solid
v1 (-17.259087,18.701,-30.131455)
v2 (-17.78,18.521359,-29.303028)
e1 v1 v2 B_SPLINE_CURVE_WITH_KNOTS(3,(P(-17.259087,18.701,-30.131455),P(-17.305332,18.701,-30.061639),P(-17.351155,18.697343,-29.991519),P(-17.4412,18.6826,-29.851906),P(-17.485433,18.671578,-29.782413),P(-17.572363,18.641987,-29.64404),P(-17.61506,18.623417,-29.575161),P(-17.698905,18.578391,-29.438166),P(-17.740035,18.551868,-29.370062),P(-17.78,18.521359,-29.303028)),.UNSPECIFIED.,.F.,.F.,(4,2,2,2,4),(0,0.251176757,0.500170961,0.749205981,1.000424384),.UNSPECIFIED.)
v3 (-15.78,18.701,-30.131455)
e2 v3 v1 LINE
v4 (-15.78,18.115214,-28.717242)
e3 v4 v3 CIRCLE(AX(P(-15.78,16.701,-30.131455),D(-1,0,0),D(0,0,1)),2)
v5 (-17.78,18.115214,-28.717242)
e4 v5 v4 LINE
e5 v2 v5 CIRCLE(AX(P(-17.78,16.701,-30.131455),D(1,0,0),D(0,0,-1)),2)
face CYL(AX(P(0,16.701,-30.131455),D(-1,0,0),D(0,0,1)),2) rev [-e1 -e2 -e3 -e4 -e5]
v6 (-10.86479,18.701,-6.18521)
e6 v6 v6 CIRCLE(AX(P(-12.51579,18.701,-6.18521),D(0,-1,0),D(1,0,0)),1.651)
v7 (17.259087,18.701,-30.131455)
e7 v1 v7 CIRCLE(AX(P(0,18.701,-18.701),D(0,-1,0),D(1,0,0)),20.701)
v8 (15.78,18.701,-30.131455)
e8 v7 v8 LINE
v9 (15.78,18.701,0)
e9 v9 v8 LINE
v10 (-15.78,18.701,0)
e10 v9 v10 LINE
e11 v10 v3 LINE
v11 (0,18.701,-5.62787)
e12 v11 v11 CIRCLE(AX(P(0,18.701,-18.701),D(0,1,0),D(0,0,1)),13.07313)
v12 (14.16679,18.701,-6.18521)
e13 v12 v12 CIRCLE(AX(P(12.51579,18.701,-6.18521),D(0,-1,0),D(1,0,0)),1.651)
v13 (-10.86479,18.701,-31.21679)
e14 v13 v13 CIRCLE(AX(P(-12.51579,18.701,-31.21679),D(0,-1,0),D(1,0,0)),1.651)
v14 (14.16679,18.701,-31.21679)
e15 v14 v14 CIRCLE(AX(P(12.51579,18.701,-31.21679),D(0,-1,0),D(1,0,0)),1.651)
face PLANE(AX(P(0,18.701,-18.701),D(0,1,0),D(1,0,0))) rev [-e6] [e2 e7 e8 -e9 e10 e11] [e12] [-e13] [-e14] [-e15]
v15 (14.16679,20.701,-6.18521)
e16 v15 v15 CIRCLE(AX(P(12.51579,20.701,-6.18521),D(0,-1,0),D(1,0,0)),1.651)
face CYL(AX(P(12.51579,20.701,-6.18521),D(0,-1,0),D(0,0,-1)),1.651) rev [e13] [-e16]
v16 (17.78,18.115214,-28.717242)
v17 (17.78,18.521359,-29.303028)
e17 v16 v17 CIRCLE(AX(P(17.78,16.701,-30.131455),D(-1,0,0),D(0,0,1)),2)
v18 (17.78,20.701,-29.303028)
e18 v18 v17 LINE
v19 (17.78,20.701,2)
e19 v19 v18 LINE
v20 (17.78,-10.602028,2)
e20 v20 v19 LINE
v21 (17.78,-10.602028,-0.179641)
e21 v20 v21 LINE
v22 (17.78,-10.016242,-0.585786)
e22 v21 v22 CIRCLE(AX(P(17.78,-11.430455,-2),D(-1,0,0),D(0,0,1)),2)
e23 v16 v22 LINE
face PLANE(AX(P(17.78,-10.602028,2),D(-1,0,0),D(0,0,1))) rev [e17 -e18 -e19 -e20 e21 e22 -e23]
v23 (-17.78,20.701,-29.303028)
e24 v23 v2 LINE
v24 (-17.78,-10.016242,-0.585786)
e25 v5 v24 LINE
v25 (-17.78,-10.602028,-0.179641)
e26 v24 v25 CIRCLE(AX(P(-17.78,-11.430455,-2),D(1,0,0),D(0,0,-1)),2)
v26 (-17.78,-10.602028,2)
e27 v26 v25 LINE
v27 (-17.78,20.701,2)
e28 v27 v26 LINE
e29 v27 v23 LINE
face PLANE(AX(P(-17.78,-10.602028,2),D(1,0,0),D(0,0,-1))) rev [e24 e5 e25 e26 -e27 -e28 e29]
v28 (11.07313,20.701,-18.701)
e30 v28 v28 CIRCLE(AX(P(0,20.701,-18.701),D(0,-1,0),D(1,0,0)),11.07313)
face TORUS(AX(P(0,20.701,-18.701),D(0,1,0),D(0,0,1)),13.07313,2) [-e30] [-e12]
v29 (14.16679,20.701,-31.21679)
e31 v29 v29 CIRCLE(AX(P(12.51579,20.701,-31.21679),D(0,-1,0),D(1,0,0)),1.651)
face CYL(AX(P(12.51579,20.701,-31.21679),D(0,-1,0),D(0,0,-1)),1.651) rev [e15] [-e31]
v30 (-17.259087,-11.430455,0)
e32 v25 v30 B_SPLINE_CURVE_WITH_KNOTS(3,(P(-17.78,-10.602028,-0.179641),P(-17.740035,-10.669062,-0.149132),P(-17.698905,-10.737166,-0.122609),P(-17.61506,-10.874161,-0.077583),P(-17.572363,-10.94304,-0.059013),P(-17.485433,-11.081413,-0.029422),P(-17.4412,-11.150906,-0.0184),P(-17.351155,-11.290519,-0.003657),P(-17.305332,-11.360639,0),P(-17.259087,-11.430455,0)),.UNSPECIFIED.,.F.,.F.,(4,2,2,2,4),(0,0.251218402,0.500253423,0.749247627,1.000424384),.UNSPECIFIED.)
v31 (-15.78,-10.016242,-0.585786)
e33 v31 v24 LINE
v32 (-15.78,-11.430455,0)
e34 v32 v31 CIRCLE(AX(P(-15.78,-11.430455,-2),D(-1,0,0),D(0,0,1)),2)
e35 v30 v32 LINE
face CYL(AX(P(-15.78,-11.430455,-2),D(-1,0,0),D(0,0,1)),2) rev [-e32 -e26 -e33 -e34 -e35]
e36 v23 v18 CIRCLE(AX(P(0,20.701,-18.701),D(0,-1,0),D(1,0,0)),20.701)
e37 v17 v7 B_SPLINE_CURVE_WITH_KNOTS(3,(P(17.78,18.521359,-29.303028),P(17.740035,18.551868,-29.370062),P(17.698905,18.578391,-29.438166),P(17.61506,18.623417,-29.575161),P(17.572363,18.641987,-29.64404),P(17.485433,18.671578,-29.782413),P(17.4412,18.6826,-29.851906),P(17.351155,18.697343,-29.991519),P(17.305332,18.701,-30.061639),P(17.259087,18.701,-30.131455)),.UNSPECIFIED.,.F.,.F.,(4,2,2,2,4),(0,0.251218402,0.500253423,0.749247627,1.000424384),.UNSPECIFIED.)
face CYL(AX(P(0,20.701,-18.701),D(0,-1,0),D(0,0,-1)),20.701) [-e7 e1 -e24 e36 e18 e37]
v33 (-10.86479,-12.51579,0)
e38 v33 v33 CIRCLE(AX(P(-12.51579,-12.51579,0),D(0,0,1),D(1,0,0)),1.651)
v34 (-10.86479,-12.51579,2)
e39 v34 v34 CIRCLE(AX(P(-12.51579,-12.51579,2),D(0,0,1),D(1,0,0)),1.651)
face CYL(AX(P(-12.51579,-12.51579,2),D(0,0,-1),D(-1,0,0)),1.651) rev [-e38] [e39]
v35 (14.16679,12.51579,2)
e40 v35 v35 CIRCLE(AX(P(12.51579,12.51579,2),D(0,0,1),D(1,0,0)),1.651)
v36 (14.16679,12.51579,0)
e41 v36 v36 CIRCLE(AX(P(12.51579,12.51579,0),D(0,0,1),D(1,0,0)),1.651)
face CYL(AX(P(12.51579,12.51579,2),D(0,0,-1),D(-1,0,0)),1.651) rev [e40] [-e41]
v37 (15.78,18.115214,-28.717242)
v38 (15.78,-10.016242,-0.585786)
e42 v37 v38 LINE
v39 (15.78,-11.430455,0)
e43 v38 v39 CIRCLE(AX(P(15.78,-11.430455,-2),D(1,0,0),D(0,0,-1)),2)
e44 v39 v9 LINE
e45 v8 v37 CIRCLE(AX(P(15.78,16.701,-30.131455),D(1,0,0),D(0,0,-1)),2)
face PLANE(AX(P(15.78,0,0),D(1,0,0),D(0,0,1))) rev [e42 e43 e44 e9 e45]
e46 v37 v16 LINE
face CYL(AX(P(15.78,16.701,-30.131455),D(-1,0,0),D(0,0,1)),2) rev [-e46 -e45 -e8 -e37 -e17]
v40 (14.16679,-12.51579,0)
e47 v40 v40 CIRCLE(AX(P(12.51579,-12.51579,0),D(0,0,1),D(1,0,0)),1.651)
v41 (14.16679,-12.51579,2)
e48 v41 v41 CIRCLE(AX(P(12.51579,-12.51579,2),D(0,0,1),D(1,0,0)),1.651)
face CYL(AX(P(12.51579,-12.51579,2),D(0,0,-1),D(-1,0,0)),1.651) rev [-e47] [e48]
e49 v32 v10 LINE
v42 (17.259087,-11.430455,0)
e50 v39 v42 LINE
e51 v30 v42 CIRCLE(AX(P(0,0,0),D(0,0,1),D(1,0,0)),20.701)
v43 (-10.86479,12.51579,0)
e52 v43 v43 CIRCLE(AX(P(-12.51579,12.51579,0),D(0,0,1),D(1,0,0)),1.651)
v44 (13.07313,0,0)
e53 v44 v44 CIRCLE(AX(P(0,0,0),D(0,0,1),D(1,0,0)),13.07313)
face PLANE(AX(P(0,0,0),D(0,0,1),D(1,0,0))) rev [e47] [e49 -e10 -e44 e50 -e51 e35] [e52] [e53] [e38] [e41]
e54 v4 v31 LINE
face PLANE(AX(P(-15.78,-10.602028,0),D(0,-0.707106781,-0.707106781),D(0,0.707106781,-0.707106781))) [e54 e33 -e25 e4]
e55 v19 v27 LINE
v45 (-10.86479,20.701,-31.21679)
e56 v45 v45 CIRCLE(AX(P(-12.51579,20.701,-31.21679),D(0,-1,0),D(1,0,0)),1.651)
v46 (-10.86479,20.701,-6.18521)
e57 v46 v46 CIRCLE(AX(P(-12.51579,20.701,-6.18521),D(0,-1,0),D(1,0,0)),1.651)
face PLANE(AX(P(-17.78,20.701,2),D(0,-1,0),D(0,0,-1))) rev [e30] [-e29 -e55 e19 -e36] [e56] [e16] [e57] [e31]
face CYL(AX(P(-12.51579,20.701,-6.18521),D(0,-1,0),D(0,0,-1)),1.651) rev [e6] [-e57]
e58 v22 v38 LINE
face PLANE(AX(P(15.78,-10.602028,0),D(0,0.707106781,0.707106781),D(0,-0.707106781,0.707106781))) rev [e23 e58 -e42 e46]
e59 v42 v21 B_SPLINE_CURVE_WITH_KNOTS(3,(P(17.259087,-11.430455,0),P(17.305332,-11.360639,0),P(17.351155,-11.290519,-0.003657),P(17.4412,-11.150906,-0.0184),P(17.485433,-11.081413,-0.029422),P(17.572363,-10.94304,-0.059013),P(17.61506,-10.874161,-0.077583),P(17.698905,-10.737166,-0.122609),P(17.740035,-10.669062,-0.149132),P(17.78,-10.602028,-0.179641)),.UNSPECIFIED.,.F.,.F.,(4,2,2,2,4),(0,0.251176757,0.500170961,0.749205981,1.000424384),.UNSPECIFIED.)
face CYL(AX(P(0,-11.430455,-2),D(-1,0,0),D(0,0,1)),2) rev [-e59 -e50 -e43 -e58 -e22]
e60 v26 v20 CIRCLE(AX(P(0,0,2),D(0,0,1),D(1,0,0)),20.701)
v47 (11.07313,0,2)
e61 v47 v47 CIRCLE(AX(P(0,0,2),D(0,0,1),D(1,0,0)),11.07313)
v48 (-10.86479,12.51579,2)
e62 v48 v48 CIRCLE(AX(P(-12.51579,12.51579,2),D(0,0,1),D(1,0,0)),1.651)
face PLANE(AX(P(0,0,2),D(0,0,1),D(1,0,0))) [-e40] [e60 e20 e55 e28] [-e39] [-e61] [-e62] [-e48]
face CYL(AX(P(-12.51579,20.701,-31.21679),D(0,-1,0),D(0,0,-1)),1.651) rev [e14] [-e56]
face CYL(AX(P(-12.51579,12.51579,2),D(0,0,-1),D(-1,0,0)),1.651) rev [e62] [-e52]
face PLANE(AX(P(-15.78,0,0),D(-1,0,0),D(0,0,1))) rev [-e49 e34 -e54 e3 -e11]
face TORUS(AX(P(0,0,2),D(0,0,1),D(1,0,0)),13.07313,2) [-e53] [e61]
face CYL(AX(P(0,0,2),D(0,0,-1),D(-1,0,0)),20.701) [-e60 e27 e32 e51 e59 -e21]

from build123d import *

# Parameters (mm, degrees)
SKETCH1_R           = 1.651
SKETCH1_R_2         = 11.07313
BOSS_EXTRUDE1_DEPTH = 2
BOSS_EXTRUDE2_DEPTH = 2
FILLET2_R           = 2
FILLET3_R           = 2


with BuildPart() as part:
    # Sketch1 → Boss-Extrude1 (new body)
    with BuildSketch(Plane.XY):
        with BuildLine():
            Line((-17.78, -10.602028155), (-17.78, 20.701))
            Line((-17.78, 20.701), (17.78, 20.701))
            Line((17.78, 20.701), (17.78, -10.602028155))
            ThreePointArc((17.78, -10.602028155), (0, -20.701), (-17.78, -10.602028155))
        make_face()
        with Locations((-12.515790027, -12.515790027)):
            Circle(SKETCH1_R, mode=Mode.SUBTRACT)
        with Locations((12.515790027, -12.515790027)):
            Circle(SKETCH1_R, mode=Mode.SUBTRACT)
        with Locations((12.515790027, 12.515790027)):
            Circle(SKETCH1_R, mode=Mode.SUBTRACT)
        with Locations((-12.515790027, 12.515790027)):
            Circle(SKETCH1_R, mode=Mode.SUBTRACT)
        Circle(SKETCH1_R_2, mode=Mode.SUBTRACT)
    boss_extrude1 = extrude(amount=BOSS_EXTRUDE1_DEPTH)

    # Mirror1: Boss-Extrude1 across plane
    add(boss_extrude1.mirror(Plane(origin=(0, 9.3505, -9.3505), x_dir=(0, 0.7071067811865465, 0.7071067811865486), z_dir=(0, -0.7071067811865488, 0.7071067811865464))))

    # Sketch2 → Boss-Extrude2 (add)
    with BuildSketch(Plane.ZY.offset(17.78)):
        Polygon((0, -10.602028155), (-29.303028155, 18.701), (0, 18.701), align=None)
    boss_extrude2 = extrude(amount=-BOSS_EXTRUDE2_DEPTH)

    # Mirror2: Boss-Extrude2 across plane
    add(boss_extrude2.mirror(Plane(origin=(0, 0, 0), x_dir=(0, 0, 1), z_dir=(1, 0, 0))))

    # Fillet2
    fillet2_edges = [part.edges().sort_by_distance(p)[0] for p in [
        (-11.07313, 0, 0),
        (-11.07313, 18.701, -18.701),
    ]]
    fillet(fillet2_edges, radius=FILLET2_R - 0.0001)  # a hair under: the kernel refuses the full size

    # Fillet3
    fillet3_edges = [part.edges().sort_by_distance(p)[0] for p in [
        (-16.78, -10.602028155, 0),
        (-16.78, 18.701, -29.303028155),
        (16.78, -10.602028155, 0),
        (16.78, 18.701, -29.303028155),
    ]]
    fillet(fillet3_edges, radius=FILLET3_R)


solid = part.part
